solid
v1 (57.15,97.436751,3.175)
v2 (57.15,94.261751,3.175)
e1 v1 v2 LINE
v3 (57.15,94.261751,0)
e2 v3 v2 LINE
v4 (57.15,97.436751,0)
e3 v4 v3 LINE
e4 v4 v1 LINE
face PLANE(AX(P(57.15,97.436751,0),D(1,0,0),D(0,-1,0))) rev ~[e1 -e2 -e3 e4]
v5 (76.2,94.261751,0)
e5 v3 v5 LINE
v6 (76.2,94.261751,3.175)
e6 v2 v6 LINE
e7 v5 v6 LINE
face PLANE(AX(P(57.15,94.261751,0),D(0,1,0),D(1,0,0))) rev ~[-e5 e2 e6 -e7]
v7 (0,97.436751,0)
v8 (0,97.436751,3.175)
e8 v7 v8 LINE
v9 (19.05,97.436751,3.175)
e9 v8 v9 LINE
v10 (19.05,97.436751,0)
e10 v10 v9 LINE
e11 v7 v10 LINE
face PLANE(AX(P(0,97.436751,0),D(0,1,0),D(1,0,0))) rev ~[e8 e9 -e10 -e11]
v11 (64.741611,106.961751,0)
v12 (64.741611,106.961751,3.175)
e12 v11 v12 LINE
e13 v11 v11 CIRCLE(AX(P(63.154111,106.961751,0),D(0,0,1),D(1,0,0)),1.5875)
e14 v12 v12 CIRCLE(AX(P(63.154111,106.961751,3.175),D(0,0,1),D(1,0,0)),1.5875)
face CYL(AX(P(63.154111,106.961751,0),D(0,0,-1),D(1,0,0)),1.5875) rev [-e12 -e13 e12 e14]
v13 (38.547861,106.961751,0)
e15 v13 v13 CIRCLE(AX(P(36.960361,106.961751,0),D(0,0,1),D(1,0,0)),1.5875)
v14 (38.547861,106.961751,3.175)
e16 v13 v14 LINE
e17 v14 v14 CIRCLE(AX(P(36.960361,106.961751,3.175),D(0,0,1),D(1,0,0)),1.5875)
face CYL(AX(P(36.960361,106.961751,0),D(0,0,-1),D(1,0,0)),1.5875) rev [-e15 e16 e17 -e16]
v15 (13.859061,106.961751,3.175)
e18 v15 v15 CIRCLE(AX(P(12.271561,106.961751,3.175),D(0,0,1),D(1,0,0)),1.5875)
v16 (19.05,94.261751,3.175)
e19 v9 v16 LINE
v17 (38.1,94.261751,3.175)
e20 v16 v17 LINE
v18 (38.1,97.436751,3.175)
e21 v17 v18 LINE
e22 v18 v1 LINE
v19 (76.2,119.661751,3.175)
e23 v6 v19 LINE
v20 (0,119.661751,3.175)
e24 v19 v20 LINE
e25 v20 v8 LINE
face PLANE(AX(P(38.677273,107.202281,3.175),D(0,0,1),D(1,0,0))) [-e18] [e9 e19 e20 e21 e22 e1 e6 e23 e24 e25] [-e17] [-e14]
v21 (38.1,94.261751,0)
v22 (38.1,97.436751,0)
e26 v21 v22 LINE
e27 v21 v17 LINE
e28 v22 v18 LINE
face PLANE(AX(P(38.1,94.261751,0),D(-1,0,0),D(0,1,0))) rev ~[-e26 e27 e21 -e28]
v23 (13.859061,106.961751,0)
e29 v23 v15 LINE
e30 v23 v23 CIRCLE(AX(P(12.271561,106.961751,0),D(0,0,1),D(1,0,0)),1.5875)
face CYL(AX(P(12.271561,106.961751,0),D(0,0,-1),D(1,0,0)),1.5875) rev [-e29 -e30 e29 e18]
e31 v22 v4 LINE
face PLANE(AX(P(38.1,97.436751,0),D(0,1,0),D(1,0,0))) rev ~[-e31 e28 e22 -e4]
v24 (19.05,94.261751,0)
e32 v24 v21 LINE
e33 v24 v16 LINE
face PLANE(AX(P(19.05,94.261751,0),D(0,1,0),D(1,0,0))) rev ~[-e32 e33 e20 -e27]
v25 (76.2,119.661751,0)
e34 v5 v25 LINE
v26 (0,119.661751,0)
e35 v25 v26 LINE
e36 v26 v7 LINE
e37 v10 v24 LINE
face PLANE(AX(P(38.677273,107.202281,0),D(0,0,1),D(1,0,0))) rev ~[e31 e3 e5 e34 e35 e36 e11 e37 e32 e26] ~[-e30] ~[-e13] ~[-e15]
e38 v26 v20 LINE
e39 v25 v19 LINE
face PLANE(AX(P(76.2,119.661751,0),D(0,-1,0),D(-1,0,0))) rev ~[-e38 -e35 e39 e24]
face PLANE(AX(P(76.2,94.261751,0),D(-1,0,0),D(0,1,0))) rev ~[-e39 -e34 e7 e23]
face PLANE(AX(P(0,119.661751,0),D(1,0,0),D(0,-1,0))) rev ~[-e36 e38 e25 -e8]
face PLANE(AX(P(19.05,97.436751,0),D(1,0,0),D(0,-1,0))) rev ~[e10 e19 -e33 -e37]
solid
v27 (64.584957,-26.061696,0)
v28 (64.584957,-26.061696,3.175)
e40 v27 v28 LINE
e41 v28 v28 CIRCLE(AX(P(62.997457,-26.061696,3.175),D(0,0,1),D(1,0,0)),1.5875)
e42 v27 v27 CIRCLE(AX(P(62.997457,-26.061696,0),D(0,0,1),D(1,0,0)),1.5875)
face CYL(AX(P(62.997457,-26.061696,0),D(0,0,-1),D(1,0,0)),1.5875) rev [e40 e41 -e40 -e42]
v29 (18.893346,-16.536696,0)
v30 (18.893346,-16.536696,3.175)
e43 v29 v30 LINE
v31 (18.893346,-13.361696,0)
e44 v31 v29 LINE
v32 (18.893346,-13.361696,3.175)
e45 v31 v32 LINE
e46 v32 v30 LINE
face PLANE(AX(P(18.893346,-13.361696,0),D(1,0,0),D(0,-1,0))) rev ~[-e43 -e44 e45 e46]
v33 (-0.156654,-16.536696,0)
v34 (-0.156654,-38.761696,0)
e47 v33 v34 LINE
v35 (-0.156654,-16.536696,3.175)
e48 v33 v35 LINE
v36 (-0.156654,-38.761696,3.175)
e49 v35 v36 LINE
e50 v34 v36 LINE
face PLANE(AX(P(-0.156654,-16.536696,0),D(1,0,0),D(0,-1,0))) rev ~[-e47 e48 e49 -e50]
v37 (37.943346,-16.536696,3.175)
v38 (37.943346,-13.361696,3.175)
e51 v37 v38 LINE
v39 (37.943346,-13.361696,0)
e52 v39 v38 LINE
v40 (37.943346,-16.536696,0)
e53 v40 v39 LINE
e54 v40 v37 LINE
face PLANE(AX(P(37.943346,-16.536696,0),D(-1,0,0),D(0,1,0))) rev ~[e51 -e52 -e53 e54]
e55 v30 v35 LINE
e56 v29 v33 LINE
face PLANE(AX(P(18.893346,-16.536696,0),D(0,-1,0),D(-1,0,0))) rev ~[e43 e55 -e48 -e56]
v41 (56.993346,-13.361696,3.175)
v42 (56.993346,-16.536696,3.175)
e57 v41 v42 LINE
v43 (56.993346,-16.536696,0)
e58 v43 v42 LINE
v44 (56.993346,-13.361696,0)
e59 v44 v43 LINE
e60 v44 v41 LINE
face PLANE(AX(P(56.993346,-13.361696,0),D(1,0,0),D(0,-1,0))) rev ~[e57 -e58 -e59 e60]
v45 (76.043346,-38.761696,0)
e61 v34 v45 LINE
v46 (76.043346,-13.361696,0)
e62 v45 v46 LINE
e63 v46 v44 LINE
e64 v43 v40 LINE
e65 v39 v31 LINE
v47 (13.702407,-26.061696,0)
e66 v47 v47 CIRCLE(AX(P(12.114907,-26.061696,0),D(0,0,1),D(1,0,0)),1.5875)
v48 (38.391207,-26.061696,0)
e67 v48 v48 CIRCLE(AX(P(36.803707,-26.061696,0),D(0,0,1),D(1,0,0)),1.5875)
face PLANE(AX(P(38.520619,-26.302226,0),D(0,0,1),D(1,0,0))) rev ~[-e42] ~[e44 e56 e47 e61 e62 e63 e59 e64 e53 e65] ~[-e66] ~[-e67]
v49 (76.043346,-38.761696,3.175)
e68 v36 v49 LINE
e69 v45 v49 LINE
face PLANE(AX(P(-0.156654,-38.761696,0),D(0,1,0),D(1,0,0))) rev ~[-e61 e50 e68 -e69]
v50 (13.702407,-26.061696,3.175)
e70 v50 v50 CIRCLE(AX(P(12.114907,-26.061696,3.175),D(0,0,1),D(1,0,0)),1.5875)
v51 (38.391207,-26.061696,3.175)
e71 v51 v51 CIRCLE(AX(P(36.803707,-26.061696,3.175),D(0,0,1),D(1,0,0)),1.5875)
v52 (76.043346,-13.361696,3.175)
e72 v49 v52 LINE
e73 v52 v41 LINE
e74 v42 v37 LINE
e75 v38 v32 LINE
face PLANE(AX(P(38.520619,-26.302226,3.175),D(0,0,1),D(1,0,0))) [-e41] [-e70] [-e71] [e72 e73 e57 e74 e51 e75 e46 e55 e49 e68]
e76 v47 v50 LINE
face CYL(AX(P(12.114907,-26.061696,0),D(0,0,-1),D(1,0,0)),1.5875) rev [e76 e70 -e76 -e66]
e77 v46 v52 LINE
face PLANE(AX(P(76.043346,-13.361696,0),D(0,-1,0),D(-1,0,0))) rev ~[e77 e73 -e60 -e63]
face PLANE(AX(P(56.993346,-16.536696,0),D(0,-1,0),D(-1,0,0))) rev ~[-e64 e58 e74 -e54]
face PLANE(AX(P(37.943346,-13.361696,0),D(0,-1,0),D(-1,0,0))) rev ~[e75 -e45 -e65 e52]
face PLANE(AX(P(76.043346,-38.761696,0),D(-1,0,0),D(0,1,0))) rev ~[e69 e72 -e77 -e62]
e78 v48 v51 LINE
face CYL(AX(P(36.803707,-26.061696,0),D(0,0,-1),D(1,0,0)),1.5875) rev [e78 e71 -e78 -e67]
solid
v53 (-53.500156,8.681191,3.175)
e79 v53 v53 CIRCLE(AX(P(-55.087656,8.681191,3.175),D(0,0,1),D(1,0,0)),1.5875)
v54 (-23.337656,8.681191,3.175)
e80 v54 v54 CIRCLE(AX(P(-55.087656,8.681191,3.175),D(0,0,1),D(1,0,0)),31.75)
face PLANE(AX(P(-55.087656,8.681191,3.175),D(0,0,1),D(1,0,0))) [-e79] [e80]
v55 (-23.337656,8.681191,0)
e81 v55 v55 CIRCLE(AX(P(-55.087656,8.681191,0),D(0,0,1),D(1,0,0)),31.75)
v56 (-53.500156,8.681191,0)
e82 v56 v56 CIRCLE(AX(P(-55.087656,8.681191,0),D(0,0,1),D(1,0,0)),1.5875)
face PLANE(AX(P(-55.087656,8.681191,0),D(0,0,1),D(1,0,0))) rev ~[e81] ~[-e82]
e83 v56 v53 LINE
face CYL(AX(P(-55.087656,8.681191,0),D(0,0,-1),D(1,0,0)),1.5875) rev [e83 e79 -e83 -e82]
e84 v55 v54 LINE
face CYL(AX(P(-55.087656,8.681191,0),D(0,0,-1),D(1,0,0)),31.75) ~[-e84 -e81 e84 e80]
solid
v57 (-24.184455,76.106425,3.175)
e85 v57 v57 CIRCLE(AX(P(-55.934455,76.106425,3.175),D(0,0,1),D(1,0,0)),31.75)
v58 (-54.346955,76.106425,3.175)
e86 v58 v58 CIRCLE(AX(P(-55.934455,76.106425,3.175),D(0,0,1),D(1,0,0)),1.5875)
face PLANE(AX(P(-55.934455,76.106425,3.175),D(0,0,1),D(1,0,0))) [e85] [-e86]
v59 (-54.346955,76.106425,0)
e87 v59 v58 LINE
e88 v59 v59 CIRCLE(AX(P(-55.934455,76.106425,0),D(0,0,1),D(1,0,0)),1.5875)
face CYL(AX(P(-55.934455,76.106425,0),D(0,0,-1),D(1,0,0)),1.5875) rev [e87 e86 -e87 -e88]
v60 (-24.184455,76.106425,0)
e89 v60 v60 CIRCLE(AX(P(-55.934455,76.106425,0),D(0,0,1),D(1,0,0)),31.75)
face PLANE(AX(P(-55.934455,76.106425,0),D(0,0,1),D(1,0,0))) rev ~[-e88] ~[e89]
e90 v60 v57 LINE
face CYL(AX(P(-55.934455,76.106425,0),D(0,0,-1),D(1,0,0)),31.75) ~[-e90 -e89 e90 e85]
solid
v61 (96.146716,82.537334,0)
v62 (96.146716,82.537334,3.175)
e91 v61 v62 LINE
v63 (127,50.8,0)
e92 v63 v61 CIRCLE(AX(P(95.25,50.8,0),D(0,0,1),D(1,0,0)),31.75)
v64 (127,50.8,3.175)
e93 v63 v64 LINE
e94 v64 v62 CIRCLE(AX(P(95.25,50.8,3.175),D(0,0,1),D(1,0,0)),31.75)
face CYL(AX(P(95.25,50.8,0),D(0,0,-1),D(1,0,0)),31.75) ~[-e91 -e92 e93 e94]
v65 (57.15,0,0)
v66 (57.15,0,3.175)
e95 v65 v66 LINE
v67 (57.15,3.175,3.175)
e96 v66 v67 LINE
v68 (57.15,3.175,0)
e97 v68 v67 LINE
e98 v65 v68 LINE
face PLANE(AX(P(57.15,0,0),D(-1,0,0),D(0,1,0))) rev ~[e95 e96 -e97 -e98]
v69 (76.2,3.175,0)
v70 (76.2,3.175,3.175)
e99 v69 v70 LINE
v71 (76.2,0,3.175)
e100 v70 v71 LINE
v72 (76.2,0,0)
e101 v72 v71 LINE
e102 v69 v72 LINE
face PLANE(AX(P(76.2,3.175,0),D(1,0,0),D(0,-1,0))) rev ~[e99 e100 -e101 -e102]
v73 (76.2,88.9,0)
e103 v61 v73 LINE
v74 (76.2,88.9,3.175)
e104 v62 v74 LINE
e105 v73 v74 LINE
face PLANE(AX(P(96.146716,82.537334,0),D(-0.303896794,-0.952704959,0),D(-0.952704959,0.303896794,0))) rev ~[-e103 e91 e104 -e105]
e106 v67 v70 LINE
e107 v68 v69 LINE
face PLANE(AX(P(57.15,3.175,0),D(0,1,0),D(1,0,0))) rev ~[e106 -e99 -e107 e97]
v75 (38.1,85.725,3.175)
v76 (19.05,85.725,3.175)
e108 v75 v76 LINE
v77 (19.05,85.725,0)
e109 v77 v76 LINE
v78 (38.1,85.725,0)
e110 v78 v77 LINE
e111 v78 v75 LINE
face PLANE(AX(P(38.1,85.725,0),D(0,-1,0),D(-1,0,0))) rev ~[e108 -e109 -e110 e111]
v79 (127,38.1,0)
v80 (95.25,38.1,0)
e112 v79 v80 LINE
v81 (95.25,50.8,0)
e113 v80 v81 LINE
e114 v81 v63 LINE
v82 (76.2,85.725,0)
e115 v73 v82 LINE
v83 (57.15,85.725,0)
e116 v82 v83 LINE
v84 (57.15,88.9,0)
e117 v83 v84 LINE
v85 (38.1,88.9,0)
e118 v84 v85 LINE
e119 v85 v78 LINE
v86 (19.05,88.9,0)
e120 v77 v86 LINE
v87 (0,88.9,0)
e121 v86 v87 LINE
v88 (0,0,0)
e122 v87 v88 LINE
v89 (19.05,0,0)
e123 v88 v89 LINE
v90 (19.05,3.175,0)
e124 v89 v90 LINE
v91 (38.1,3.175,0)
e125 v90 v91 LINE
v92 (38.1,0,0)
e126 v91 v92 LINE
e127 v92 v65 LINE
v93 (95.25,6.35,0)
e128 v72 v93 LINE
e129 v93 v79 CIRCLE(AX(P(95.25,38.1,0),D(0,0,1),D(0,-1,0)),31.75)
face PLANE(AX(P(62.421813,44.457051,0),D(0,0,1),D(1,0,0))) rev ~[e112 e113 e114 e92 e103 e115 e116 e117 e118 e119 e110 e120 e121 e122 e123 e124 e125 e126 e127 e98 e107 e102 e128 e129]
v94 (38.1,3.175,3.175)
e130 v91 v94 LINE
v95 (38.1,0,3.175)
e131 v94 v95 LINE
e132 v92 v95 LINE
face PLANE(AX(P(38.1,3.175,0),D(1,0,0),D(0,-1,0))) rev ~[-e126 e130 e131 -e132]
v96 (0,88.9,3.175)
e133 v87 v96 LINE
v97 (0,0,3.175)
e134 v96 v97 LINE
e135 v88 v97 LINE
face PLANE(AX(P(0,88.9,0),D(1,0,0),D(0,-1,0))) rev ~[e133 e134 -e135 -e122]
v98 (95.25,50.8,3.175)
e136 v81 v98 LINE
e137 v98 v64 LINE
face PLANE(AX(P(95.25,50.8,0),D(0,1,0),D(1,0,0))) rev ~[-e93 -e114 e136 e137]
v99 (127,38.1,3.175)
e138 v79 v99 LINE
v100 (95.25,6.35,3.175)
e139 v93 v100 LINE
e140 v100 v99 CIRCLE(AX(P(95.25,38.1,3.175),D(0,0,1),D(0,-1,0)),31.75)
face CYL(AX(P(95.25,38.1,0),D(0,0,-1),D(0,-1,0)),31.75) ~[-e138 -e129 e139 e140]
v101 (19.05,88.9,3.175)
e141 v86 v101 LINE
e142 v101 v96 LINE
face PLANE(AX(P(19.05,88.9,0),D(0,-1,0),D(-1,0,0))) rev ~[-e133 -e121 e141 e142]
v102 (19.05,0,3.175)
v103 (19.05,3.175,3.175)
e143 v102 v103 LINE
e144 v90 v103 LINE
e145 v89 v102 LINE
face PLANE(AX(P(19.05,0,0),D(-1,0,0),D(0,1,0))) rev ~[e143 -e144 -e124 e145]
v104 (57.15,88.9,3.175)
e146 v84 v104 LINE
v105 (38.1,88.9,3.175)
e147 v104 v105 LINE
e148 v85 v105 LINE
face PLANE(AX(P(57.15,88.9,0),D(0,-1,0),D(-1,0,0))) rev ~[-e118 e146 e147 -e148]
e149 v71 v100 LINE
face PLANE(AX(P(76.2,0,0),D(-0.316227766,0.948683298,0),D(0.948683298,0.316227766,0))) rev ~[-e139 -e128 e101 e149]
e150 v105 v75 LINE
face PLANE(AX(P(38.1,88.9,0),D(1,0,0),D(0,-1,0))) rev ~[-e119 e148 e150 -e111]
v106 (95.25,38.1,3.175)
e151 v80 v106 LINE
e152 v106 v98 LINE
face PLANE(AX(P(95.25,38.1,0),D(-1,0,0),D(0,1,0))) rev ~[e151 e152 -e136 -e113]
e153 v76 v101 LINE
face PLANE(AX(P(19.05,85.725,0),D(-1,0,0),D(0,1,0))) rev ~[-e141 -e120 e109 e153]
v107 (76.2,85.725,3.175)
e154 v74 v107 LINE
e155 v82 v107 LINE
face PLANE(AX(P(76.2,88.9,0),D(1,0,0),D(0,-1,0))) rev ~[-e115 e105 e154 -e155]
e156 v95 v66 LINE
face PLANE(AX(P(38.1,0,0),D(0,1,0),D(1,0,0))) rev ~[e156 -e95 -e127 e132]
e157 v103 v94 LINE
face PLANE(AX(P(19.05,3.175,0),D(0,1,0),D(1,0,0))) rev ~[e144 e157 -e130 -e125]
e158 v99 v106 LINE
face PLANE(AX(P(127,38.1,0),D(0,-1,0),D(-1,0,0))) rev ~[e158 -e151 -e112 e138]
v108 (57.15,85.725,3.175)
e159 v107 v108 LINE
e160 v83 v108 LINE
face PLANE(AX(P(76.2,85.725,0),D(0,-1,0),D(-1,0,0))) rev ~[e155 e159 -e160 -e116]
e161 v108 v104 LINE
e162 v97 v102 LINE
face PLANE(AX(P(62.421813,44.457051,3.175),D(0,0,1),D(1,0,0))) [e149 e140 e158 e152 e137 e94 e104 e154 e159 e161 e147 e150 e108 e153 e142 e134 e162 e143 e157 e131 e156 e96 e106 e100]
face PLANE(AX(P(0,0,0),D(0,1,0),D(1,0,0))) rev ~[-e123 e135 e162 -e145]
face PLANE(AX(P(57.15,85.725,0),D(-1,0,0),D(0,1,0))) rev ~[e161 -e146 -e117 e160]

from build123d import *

# Parameters (mm, degrees)
F0_R     = 1.5875
F1_DEPTH = 3.175
F0_R_2   = 31.75


# Not quite as in the source:
# - a feature names something its author has since deleted; it is built from what else it names


with BuildPart() as f1:
    # F0 (on Top) → F1 (new body)
    with BuildSketch(Plane.XY):
        Polygon((19.05, 97.4367505789), (19.05, 94.2617505789), (38.1, 94.2617505789), (38.1, 97.4367505789), (57.15, 97.4367505789), (57.15, 94.2617505789), (76.2, 94.2617505789), (76.2, 119.6617505789), (50.8, 119.6617505789), (0, 119.6617505789), (0, 97.4367505789), align=None)
        with Locations((12.2715613582, 106.9617505789)):
            Circle(F0_R, mode=Mode.SUBTRACT)
        with Locations((36.9603613582, 106.9617505789)):
            Circle(F0_R, mode=Mode.SUBTRACT)
        with Locations((63.1541113582, 106.9617505789)):
            Circle(F0_R, mode=Mode.SUBTRACT)
    extrude(amount=F1_DEPTH)


with BuildPart() as f1b:
    # F0 (on Top) → F1, piece 2 (new body)
    with BuildSketch(Plane.XY):
        with BuildLine():
            Line((0, 88.9), (0, 0))
            Line((0, 0), (19.05, 0))
            Line((19.05, 0), (19.05, 3.175))
            Line((19.05, 3.175), (38.1, 3.175))
            Line((38.1, 3.175), (38.1, 0))
            Line((38.1, 0), (57.15, 0))
            Line((57.15, 0), (57.15, 3.175))
            Line((57.15, 3.175), (76.2, 3.175))
            Line((76.2, 3.175), (76.2, 0))
            Line((76.2, 0), (95.25, 6.35))
            ThreePointArc((95.25, 6.35), (117.7006403027, 15.6493596973), (127, 38.1))
            Line((127, 38.1), (95.25, 38.1))
            Line((95.25, 38.1), (95.25, 50.8))
            Line((95.25, 50.8), (127, 50.8))
            ThreePointArc((127, 50.8), (118.0154697598, 72.9313326895), (96.1467158039, 82.5373344937))
            Line((96.1467158039, 82.5373344937), (76.2, 88.9))
            Line((76.2, 88.9), (76.2, 85.725))
            Line((76.2, 85.725), (57.15, 85.725))
            Line((57.15, 85.725), (57.15, 88.9))
            Line((57.15, 88.9), (38.1, 88.9))
            Line((38.1, 88.9), (38.1, 85.725))
            Line((38.1, 85.725), (19.05, 85.725))
            Line((19.05, 85.725), (19.05, 88.9))
            Line((19.05, 88.9), (0, 88.9))
        make_face()
    extrude(amount=F1_DEPTH)


with BuildPart() as f1c:
    # F0 (on Top) → F1, piece 3 (new body)
    with BuildSketch(Plane.XY):
        with Locations((-55.9344552457, 76.1064253747)):
            Circle(F0_R_2)
        with Locations((-55.9344552457, 76.1064253747)):
            Circle(F0_R, mode=Mode.SUBTRACT)
    extrude(amount=F1_DEPTH)


with BuildPart() as f1d:
    # F0 (on Top) → F1, piece 4 (new body)
    with BuildSketch(Plane.XY):
        with Locations((-55.0876557827, 8.6811911315)):
            Circle(F0_R_2)
        with Locations((-55.0876557827, 8.6811911315)):
            Circle(F0_R, mode=Mode.SUBTRACT)
    extrude(amount=F1_DEPTH)


with BuildPart() as f1e:
    # F0 (on Top) → F1, piece 5 (new body)
    with BuildSketch(Plane.XY):
        Polygon((18.8933457804, -16.5366958239), (-0.1566542196, -16.5366958239), (-0.1566542196, -38.7616958239), (36.8386008513, -38.7616958239), (76.0433457804, -38.7616958239), (76.0433457804, -13.3616958239), (56.9933457804, -13.3616958239), (56.9933457804, -16.5366958239), (37.9433457804, -16.5366958239), (37.9433457804, -13.3616958239), (18.8933457804, -13.3616958239), align=None)
        with Locations((12.1149071386, -26.0616958239)):
            Circle(F0_R, mode=Mode.SUBTRACT)
        with Locations((36.8037071386, -26.0616958239)):
            Circle(F0_R, mode=Mode.SUBTRACT)
        with Locations((62.9974571386, -26.0616958239)):
            Circle(F0_R, mode=Mode.SUBTRACT)
    extrude(amount=F1_DEPTH)


solid = Compound([f1.part, f1b.part, f1c.part, f1d.part, f1e.part])
